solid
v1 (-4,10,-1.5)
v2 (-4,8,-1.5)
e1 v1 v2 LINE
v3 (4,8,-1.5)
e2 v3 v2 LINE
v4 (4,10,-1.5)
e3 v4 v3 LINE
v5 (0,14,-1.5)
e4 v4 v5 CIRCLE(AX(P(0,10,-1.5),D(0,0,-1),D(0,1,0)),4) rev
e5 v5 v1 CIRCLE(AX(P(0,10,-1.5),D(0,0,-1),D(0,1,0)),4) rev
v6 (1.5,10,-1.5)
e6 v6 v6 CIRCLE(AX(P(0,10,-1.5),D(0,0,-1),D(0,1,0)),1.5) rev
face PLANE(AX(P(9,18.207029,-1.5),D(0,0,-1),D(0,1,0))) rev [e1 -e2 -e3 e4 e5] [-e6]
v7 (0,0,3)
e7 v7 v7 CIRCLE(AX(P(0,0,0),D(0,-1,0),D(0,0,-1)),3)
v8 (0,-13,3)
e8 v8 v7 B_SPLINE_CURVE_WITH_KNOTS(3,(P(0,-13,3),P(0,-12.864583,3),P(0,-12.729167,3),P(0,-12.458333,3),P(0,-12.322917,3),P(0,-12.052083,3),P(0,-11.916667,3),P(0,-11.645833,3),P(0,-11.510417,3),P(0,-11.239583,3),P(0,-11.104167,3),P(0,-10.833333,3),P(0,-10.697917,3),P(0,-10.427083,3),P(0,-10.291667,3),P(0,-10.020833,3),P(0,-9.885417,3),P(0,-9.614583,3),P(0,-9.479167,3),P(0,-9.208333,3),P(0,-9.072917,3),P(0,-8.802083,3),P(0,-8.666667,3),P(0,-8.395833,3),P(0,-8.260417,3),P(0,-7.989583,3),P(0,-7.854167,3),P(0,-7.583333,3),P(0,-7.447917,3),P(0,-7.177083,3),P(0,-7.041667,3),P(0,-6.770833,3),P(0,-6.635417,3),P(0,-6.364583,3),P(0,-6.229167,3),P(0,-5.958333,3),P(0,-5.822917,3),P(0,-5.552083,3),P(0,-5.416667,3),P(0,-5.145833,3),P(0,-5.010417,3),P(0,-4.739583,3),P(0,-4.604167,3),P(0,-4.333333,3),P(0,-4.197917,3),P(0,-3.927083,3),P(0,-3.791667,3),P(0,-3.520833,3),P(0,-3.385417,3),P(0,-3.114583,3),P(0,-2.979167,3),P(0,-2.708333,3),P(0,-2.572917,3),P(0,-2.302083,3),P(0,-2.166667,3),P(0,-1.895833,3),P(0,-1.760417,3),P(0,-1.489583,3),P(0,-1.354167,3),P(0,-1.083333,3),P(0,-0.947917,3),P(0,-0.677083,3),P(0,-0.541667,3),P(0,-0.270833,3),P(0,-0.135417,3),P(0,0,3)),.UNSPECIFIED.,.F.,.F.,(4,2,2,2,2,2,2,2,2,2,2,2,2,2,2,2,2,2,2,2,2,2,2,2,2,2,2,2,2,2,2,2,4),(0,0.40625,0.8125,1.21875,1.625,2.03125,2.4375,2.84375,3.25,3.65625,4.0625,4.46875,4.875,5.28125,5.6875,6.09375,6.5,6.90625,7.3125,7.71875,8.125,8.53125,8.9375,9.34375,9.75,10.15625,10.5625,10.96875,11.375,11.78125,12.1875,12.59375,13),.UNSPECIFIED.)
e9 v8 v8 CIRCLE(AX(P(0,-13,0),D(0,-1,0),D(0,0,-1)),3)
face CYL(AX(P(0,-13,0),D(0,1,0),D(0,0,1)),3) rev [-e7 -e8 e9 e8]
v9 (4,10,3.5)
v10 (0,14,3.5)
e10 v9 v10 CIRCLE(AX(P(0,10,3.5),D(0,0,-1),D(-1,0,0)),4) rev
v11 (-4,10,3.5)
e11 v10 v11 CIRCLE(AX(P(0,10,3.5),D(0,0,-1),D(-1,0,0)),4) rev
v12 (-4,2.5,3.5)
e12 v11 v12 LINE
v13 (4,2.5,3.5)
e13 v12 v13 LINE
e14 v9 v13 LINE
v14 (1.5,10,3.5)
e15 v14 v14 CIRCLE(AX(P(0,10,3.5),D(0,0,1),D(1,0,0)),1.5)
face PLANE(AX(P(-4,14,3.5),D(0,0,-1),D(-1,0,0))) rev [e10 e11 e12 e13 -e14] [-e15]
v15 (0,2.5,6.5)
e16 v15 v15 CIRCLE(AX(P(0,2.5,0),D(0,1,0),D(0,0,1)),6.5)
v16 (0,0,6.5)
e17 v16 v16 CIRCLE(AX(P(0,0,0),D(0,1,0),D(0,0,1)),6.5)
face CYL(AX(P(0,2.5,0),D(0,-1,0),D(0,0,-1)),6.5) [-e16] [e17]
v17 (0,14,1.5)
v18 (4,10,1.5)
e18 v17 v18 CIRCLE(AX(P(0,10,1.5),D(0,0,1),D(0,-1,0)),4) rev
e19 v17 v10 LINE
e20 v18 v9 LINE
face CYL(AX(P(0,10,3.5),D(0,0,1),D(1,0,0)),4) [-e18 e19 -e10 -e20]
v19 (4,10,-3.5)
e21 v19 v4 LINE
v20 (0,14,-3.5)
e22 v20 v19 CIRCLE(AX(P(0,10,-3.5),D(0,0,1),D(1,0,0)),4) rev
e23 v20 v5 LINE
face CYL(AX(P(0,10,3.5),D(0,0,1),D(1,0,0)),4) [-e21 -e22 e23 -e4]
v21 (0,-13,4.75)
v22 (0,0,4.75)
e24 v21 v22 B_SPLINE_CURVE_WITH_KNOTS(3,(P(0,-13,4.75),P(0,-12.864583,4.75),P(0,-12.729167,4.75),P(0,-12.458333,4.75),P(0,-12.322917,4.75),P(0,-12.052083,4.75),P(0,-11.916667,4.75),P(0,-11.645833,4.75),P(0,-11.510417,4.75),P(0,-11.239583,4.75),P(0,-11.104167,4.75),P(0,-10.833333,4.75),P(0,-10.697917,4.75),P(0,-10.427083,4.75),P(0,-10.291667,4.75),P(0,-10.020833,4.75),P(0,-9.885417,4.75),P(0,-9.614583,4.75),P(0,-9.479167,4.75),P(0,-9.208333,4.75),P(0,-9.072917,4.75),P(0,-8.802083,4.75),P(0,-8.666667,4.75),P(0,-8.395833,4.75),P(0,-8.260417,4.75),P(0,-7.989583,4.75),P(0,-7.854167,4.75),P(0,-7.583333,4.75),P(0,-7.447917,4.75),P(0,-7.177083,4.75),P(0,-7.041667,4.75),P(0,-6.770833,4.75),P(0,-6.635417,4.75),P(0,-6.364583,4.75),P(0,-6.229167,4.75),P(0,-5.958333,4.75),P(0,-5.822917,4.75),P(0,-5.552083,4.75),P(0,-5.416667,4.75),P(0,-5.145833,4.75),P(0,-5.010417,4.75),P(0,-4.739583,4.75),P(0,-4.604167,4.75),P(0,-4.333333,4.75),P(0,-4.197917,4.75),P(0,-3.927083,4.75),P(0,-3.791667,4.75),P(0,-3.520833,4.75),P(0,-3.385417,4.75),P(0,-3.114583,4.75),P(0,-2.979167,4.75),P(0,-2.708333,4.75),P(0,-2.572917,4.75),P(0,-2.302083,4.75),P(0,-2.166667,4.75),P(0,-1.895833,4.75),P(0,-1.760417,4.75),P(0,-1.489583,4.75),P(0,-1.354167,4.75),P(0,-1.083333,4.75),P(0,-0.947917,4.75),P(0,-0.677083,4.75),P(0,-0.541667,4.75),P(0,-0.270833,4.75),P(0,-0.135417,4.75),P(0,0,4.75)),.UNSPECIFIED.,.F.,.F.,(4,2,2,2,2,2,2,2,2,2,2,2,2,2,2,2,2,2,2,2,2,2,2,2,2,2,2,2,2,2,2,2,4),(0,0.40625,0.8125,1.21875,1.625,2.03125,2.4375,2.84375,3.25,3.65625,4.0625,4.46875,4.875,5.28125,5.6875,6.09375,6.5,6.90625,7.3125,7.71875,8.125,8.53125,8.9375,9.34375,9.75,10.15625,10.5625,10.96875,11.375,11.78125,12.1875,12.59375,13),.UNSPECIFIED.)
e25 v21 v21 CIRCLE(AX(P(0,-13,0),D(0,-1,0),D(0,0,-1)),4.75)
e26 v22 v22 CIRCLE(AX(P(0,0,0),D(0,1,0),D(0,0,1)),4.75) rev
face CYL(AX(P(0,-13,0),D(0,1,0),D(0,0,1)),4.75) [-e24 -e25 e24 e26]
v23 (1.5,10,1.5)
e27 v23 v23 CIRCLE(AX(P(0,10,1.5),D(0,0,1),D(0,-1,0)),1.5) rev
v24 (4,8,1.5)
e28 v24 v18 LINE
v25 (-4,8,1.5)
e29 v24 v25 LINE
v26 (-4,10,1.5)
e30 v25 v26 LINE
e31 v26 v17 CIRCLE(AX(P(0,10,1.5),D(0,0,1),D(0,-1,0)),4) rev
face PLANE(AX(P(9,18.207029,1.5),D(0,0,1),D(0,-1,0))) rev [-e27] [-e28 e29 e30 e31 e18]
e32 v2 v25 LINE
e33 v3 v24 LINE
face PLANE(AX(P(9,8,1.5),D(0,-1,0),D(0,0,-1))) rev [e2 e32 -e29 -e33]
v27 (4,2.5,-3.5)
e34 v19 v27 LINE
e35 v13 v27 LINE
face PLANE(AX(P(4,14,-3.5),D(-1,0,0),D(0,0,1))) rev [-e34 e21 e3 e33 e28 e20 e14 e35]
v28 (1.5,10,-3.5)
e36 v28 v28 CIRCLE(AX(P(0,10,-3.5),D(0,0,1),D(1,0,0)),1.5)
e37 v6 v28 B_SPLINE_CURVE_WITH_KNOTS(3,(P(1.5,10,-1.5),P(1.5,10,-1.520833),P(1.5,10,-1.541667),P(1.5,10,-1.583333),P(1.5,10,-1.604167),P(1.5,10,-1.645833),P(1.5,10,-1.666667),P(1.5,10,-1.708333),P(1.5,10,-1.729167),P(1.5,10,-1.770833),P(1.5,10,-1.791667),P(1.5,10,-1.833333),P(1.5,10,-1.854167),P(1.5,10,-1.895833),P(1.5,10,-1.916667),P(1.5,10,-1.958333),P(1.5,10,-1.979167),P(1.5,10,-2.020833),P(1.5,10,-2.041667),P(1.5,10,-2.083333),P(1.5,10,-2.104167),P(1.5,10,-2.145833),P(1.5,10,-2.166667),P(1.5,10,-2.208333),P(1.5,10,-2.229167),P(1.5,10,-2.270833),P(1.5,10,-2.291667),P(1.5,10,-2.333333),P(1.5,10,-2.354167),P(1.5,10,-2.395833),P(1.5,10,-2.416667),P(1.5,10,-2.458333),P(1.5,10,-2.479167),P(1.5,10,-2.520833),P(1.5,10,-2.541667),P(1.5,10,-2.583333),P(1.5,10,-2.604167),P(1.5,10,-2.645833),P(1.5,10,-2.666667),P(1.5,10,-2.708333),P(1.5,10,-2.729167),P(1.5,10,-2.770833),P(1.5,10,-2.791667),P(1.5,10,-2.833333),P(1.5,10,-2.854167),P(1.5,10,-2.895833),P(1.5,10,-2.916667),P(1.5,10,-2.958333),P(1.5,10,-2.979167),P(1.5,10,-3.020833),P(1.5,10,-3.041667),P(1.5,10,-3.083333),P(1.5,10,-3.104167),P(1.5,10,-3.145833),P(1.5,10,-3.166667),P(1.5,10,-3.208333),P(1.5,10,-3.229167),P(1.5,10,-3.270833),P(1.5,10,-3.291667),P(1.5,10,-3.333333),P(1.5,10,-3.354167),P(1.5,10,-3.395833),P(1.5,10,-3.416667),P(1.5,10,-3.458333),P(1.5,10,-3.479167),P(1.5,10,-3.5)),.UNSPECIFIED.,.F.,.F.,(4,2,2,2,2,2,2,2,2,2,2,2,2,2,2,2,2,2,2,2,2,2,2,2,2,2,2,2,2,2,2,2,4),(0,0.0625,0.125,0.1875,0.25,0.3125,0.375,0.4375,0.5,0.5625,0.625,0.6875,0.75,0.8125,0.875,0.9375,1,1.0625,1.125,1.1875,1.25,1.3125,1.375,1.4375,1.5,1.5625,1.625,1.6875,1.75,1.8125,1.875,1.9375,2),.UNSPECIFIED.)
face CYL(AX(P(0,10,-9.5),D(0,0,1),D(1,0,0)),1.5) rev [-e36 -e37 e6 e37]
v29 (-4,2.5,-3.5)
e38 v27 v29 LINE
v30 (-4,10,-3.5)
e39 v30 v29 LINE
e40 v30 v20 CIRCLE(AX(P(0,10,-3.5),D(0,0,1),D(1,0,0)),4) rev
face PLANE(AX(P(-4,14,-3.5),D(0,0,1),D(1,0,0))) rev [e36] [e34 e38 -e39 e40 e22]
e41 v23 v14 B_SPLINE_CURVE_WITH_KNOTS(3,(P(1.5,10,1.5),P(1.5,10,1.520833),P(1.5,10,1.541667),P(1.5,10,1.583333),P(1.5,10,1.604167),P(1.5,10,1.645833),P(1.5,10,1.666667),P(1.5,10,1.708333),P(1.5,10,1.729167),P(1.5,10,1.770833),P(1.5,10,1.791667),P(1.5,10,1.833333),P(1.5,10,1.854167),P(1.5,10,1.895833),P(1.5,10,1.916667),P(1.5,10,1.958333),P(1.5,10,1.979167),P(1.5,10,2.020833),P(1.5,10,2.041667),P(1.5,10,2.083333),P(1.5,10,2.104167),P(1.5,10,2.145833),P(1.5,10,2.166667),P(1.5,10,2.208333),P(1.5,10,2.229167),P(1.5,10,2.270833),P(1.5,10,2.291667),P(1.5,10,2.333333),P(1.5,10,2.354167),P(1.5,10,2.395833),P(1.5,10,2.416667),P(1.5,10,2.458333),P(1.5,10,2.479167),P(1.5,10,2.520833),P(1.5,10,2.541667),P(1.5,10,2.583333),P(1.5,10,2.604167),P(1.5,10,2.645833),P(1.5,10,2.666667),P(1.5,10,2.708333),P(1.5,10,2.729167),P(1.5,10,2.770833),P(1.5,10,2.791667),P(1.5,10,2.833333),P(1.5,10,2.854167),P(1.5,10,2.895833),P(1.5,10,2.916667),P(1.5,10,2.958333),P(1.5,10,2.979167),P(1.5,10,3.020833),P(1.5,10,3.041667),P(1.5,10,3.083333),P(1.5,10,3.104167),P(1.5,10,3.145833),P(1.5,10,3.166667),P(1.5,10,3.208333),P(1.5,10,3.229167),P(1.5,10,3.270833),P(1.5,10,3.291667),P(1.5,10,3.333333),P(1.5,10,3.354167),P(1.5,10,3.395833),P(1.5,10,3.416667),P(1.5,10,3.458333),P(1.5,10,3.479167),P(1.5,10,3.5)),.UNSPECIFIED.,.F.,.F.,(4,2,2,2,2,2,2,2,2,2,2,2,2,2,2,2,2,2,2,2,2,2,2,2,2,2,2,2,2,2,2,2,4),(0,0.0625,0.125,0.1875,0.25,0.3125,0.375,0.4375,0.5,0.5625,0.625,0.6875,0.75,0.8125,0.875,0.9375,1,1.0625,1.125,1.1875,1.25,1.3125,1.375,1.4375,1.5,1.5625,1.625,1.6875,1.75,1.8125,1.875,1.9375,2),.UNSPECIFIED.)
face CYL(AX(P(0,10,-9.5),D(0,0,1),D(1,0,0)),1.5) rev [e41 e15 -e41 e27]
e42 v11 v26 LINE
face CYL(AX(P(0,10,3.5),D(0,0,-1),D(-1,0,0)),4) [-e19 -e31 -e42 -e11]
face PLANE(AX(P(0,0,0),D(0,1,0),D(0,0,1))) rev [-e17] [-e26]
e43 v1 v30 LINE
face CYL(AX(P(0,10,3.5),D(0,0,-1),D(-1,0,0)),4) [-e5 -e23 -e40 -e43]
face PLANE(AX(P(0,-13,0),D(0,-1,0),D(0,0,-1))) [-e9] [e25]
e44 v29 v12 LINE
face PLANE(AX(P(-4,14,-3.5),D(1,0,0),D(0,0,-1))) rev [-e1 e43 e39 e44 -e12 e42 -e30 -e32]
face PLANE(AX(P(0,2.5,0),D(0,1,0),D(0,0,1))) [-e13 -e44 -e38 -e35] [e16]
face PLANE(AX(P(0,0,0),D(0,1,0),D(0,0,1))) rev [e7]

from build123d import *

# Parameters (mm, degrees)
SKETCH1_R           = 6.5
BOSS_EXTRUDE1_DEPTH = 2.5
SKETCH2_R           = 4.75
SKETCH2_R_2         = 3
BOSS_EXTRUDE2_DEPTH = 13
SKETCH3_W           = 8
SKETCH3_H           = 7
BOSS_EXTRUDE3_DEPTH = 11.5
FILLET1_R           = 4
SKETCH4_R           = 1.5
CUT_EXTRUDE1_DEPTH  = 13
SKETCH5_W           = 3
SKETCH5_H           = 10.207029109
CUT_EXTRUDE2_DEPTH  = 13


with BuildPart() as part:
    # Sketch1 → Boss-Extrude1 (new body)
    with BuildSketch(Plane(origin=(0, 0, 0), x_dir=(1, 0, 0), z_dir=(0, 1, 0))):
        with Locations(Location((0, 0, 0), (0, 0, 270))):
            Circle(SKETCH1_R)
    extrude(amount=BOSS_EXTRUDE1_DEPTH)

    # Sketch2 → Boss-Extrude2 (add)
    with BuildSketch(Plane.XZ):
        with Locations(Location((0, 0, 0), (0, 0, 90))):
            Circle(SKETCH2_R)
        with Locations(Location((0, 0, 0), (0, 0, 90))):
            Circle(SKETCH2_R_2, mode=Mode.SUBTRACT)
    extrude(amount=BOSS_EXTRUDE2_DEPTH)

    # Sketch3 → Boss-Extrude3 (add)
    with BuildSketch(Plane(origin=(0, 2.5, 0), x_dir=(1, 0, 0), z_dir=(0, 1, 0))):
        Rectangle(SKETCH3_W, SKETCH3_H)
    extrude(amount=BOSS_EXTRUDE3_DEPTH)

    # Fillet1
    fillet1_edges = [part.edges().sort_by_distance(p)[0] for p in [
        (4, 14, 0),
        (-4, 14, 0),
    ]]
    fillet(fillet1_edges, radius=FILLET1_R - 0.0001)  # a hair under: the kernel refuses the full size

    # Sketch4 → Cut-Extrude1 (cut)
    with BuildSketch(Plane.XY.offset(3.5)):
        with Locations((0, 10)):
            Circle(SKETCH4_R)
    extrude(amount=-CUT_EXTRUDE1_DEPTH, mode=Mode.SUBTRACT)

    # Sketch5 → Cut-Extrude2 (cut)
    with BuildSketch(Plane.ZY.offset(4)):
        with Locations((0, 13.103514555)):
            Rectangle(SKETCH5_W, SKETCH5_H)
    extrude(amount=-CUT_EXTRUDE2_DEPTH, mode=Mode.SUBTRACT)


solid = part.part
